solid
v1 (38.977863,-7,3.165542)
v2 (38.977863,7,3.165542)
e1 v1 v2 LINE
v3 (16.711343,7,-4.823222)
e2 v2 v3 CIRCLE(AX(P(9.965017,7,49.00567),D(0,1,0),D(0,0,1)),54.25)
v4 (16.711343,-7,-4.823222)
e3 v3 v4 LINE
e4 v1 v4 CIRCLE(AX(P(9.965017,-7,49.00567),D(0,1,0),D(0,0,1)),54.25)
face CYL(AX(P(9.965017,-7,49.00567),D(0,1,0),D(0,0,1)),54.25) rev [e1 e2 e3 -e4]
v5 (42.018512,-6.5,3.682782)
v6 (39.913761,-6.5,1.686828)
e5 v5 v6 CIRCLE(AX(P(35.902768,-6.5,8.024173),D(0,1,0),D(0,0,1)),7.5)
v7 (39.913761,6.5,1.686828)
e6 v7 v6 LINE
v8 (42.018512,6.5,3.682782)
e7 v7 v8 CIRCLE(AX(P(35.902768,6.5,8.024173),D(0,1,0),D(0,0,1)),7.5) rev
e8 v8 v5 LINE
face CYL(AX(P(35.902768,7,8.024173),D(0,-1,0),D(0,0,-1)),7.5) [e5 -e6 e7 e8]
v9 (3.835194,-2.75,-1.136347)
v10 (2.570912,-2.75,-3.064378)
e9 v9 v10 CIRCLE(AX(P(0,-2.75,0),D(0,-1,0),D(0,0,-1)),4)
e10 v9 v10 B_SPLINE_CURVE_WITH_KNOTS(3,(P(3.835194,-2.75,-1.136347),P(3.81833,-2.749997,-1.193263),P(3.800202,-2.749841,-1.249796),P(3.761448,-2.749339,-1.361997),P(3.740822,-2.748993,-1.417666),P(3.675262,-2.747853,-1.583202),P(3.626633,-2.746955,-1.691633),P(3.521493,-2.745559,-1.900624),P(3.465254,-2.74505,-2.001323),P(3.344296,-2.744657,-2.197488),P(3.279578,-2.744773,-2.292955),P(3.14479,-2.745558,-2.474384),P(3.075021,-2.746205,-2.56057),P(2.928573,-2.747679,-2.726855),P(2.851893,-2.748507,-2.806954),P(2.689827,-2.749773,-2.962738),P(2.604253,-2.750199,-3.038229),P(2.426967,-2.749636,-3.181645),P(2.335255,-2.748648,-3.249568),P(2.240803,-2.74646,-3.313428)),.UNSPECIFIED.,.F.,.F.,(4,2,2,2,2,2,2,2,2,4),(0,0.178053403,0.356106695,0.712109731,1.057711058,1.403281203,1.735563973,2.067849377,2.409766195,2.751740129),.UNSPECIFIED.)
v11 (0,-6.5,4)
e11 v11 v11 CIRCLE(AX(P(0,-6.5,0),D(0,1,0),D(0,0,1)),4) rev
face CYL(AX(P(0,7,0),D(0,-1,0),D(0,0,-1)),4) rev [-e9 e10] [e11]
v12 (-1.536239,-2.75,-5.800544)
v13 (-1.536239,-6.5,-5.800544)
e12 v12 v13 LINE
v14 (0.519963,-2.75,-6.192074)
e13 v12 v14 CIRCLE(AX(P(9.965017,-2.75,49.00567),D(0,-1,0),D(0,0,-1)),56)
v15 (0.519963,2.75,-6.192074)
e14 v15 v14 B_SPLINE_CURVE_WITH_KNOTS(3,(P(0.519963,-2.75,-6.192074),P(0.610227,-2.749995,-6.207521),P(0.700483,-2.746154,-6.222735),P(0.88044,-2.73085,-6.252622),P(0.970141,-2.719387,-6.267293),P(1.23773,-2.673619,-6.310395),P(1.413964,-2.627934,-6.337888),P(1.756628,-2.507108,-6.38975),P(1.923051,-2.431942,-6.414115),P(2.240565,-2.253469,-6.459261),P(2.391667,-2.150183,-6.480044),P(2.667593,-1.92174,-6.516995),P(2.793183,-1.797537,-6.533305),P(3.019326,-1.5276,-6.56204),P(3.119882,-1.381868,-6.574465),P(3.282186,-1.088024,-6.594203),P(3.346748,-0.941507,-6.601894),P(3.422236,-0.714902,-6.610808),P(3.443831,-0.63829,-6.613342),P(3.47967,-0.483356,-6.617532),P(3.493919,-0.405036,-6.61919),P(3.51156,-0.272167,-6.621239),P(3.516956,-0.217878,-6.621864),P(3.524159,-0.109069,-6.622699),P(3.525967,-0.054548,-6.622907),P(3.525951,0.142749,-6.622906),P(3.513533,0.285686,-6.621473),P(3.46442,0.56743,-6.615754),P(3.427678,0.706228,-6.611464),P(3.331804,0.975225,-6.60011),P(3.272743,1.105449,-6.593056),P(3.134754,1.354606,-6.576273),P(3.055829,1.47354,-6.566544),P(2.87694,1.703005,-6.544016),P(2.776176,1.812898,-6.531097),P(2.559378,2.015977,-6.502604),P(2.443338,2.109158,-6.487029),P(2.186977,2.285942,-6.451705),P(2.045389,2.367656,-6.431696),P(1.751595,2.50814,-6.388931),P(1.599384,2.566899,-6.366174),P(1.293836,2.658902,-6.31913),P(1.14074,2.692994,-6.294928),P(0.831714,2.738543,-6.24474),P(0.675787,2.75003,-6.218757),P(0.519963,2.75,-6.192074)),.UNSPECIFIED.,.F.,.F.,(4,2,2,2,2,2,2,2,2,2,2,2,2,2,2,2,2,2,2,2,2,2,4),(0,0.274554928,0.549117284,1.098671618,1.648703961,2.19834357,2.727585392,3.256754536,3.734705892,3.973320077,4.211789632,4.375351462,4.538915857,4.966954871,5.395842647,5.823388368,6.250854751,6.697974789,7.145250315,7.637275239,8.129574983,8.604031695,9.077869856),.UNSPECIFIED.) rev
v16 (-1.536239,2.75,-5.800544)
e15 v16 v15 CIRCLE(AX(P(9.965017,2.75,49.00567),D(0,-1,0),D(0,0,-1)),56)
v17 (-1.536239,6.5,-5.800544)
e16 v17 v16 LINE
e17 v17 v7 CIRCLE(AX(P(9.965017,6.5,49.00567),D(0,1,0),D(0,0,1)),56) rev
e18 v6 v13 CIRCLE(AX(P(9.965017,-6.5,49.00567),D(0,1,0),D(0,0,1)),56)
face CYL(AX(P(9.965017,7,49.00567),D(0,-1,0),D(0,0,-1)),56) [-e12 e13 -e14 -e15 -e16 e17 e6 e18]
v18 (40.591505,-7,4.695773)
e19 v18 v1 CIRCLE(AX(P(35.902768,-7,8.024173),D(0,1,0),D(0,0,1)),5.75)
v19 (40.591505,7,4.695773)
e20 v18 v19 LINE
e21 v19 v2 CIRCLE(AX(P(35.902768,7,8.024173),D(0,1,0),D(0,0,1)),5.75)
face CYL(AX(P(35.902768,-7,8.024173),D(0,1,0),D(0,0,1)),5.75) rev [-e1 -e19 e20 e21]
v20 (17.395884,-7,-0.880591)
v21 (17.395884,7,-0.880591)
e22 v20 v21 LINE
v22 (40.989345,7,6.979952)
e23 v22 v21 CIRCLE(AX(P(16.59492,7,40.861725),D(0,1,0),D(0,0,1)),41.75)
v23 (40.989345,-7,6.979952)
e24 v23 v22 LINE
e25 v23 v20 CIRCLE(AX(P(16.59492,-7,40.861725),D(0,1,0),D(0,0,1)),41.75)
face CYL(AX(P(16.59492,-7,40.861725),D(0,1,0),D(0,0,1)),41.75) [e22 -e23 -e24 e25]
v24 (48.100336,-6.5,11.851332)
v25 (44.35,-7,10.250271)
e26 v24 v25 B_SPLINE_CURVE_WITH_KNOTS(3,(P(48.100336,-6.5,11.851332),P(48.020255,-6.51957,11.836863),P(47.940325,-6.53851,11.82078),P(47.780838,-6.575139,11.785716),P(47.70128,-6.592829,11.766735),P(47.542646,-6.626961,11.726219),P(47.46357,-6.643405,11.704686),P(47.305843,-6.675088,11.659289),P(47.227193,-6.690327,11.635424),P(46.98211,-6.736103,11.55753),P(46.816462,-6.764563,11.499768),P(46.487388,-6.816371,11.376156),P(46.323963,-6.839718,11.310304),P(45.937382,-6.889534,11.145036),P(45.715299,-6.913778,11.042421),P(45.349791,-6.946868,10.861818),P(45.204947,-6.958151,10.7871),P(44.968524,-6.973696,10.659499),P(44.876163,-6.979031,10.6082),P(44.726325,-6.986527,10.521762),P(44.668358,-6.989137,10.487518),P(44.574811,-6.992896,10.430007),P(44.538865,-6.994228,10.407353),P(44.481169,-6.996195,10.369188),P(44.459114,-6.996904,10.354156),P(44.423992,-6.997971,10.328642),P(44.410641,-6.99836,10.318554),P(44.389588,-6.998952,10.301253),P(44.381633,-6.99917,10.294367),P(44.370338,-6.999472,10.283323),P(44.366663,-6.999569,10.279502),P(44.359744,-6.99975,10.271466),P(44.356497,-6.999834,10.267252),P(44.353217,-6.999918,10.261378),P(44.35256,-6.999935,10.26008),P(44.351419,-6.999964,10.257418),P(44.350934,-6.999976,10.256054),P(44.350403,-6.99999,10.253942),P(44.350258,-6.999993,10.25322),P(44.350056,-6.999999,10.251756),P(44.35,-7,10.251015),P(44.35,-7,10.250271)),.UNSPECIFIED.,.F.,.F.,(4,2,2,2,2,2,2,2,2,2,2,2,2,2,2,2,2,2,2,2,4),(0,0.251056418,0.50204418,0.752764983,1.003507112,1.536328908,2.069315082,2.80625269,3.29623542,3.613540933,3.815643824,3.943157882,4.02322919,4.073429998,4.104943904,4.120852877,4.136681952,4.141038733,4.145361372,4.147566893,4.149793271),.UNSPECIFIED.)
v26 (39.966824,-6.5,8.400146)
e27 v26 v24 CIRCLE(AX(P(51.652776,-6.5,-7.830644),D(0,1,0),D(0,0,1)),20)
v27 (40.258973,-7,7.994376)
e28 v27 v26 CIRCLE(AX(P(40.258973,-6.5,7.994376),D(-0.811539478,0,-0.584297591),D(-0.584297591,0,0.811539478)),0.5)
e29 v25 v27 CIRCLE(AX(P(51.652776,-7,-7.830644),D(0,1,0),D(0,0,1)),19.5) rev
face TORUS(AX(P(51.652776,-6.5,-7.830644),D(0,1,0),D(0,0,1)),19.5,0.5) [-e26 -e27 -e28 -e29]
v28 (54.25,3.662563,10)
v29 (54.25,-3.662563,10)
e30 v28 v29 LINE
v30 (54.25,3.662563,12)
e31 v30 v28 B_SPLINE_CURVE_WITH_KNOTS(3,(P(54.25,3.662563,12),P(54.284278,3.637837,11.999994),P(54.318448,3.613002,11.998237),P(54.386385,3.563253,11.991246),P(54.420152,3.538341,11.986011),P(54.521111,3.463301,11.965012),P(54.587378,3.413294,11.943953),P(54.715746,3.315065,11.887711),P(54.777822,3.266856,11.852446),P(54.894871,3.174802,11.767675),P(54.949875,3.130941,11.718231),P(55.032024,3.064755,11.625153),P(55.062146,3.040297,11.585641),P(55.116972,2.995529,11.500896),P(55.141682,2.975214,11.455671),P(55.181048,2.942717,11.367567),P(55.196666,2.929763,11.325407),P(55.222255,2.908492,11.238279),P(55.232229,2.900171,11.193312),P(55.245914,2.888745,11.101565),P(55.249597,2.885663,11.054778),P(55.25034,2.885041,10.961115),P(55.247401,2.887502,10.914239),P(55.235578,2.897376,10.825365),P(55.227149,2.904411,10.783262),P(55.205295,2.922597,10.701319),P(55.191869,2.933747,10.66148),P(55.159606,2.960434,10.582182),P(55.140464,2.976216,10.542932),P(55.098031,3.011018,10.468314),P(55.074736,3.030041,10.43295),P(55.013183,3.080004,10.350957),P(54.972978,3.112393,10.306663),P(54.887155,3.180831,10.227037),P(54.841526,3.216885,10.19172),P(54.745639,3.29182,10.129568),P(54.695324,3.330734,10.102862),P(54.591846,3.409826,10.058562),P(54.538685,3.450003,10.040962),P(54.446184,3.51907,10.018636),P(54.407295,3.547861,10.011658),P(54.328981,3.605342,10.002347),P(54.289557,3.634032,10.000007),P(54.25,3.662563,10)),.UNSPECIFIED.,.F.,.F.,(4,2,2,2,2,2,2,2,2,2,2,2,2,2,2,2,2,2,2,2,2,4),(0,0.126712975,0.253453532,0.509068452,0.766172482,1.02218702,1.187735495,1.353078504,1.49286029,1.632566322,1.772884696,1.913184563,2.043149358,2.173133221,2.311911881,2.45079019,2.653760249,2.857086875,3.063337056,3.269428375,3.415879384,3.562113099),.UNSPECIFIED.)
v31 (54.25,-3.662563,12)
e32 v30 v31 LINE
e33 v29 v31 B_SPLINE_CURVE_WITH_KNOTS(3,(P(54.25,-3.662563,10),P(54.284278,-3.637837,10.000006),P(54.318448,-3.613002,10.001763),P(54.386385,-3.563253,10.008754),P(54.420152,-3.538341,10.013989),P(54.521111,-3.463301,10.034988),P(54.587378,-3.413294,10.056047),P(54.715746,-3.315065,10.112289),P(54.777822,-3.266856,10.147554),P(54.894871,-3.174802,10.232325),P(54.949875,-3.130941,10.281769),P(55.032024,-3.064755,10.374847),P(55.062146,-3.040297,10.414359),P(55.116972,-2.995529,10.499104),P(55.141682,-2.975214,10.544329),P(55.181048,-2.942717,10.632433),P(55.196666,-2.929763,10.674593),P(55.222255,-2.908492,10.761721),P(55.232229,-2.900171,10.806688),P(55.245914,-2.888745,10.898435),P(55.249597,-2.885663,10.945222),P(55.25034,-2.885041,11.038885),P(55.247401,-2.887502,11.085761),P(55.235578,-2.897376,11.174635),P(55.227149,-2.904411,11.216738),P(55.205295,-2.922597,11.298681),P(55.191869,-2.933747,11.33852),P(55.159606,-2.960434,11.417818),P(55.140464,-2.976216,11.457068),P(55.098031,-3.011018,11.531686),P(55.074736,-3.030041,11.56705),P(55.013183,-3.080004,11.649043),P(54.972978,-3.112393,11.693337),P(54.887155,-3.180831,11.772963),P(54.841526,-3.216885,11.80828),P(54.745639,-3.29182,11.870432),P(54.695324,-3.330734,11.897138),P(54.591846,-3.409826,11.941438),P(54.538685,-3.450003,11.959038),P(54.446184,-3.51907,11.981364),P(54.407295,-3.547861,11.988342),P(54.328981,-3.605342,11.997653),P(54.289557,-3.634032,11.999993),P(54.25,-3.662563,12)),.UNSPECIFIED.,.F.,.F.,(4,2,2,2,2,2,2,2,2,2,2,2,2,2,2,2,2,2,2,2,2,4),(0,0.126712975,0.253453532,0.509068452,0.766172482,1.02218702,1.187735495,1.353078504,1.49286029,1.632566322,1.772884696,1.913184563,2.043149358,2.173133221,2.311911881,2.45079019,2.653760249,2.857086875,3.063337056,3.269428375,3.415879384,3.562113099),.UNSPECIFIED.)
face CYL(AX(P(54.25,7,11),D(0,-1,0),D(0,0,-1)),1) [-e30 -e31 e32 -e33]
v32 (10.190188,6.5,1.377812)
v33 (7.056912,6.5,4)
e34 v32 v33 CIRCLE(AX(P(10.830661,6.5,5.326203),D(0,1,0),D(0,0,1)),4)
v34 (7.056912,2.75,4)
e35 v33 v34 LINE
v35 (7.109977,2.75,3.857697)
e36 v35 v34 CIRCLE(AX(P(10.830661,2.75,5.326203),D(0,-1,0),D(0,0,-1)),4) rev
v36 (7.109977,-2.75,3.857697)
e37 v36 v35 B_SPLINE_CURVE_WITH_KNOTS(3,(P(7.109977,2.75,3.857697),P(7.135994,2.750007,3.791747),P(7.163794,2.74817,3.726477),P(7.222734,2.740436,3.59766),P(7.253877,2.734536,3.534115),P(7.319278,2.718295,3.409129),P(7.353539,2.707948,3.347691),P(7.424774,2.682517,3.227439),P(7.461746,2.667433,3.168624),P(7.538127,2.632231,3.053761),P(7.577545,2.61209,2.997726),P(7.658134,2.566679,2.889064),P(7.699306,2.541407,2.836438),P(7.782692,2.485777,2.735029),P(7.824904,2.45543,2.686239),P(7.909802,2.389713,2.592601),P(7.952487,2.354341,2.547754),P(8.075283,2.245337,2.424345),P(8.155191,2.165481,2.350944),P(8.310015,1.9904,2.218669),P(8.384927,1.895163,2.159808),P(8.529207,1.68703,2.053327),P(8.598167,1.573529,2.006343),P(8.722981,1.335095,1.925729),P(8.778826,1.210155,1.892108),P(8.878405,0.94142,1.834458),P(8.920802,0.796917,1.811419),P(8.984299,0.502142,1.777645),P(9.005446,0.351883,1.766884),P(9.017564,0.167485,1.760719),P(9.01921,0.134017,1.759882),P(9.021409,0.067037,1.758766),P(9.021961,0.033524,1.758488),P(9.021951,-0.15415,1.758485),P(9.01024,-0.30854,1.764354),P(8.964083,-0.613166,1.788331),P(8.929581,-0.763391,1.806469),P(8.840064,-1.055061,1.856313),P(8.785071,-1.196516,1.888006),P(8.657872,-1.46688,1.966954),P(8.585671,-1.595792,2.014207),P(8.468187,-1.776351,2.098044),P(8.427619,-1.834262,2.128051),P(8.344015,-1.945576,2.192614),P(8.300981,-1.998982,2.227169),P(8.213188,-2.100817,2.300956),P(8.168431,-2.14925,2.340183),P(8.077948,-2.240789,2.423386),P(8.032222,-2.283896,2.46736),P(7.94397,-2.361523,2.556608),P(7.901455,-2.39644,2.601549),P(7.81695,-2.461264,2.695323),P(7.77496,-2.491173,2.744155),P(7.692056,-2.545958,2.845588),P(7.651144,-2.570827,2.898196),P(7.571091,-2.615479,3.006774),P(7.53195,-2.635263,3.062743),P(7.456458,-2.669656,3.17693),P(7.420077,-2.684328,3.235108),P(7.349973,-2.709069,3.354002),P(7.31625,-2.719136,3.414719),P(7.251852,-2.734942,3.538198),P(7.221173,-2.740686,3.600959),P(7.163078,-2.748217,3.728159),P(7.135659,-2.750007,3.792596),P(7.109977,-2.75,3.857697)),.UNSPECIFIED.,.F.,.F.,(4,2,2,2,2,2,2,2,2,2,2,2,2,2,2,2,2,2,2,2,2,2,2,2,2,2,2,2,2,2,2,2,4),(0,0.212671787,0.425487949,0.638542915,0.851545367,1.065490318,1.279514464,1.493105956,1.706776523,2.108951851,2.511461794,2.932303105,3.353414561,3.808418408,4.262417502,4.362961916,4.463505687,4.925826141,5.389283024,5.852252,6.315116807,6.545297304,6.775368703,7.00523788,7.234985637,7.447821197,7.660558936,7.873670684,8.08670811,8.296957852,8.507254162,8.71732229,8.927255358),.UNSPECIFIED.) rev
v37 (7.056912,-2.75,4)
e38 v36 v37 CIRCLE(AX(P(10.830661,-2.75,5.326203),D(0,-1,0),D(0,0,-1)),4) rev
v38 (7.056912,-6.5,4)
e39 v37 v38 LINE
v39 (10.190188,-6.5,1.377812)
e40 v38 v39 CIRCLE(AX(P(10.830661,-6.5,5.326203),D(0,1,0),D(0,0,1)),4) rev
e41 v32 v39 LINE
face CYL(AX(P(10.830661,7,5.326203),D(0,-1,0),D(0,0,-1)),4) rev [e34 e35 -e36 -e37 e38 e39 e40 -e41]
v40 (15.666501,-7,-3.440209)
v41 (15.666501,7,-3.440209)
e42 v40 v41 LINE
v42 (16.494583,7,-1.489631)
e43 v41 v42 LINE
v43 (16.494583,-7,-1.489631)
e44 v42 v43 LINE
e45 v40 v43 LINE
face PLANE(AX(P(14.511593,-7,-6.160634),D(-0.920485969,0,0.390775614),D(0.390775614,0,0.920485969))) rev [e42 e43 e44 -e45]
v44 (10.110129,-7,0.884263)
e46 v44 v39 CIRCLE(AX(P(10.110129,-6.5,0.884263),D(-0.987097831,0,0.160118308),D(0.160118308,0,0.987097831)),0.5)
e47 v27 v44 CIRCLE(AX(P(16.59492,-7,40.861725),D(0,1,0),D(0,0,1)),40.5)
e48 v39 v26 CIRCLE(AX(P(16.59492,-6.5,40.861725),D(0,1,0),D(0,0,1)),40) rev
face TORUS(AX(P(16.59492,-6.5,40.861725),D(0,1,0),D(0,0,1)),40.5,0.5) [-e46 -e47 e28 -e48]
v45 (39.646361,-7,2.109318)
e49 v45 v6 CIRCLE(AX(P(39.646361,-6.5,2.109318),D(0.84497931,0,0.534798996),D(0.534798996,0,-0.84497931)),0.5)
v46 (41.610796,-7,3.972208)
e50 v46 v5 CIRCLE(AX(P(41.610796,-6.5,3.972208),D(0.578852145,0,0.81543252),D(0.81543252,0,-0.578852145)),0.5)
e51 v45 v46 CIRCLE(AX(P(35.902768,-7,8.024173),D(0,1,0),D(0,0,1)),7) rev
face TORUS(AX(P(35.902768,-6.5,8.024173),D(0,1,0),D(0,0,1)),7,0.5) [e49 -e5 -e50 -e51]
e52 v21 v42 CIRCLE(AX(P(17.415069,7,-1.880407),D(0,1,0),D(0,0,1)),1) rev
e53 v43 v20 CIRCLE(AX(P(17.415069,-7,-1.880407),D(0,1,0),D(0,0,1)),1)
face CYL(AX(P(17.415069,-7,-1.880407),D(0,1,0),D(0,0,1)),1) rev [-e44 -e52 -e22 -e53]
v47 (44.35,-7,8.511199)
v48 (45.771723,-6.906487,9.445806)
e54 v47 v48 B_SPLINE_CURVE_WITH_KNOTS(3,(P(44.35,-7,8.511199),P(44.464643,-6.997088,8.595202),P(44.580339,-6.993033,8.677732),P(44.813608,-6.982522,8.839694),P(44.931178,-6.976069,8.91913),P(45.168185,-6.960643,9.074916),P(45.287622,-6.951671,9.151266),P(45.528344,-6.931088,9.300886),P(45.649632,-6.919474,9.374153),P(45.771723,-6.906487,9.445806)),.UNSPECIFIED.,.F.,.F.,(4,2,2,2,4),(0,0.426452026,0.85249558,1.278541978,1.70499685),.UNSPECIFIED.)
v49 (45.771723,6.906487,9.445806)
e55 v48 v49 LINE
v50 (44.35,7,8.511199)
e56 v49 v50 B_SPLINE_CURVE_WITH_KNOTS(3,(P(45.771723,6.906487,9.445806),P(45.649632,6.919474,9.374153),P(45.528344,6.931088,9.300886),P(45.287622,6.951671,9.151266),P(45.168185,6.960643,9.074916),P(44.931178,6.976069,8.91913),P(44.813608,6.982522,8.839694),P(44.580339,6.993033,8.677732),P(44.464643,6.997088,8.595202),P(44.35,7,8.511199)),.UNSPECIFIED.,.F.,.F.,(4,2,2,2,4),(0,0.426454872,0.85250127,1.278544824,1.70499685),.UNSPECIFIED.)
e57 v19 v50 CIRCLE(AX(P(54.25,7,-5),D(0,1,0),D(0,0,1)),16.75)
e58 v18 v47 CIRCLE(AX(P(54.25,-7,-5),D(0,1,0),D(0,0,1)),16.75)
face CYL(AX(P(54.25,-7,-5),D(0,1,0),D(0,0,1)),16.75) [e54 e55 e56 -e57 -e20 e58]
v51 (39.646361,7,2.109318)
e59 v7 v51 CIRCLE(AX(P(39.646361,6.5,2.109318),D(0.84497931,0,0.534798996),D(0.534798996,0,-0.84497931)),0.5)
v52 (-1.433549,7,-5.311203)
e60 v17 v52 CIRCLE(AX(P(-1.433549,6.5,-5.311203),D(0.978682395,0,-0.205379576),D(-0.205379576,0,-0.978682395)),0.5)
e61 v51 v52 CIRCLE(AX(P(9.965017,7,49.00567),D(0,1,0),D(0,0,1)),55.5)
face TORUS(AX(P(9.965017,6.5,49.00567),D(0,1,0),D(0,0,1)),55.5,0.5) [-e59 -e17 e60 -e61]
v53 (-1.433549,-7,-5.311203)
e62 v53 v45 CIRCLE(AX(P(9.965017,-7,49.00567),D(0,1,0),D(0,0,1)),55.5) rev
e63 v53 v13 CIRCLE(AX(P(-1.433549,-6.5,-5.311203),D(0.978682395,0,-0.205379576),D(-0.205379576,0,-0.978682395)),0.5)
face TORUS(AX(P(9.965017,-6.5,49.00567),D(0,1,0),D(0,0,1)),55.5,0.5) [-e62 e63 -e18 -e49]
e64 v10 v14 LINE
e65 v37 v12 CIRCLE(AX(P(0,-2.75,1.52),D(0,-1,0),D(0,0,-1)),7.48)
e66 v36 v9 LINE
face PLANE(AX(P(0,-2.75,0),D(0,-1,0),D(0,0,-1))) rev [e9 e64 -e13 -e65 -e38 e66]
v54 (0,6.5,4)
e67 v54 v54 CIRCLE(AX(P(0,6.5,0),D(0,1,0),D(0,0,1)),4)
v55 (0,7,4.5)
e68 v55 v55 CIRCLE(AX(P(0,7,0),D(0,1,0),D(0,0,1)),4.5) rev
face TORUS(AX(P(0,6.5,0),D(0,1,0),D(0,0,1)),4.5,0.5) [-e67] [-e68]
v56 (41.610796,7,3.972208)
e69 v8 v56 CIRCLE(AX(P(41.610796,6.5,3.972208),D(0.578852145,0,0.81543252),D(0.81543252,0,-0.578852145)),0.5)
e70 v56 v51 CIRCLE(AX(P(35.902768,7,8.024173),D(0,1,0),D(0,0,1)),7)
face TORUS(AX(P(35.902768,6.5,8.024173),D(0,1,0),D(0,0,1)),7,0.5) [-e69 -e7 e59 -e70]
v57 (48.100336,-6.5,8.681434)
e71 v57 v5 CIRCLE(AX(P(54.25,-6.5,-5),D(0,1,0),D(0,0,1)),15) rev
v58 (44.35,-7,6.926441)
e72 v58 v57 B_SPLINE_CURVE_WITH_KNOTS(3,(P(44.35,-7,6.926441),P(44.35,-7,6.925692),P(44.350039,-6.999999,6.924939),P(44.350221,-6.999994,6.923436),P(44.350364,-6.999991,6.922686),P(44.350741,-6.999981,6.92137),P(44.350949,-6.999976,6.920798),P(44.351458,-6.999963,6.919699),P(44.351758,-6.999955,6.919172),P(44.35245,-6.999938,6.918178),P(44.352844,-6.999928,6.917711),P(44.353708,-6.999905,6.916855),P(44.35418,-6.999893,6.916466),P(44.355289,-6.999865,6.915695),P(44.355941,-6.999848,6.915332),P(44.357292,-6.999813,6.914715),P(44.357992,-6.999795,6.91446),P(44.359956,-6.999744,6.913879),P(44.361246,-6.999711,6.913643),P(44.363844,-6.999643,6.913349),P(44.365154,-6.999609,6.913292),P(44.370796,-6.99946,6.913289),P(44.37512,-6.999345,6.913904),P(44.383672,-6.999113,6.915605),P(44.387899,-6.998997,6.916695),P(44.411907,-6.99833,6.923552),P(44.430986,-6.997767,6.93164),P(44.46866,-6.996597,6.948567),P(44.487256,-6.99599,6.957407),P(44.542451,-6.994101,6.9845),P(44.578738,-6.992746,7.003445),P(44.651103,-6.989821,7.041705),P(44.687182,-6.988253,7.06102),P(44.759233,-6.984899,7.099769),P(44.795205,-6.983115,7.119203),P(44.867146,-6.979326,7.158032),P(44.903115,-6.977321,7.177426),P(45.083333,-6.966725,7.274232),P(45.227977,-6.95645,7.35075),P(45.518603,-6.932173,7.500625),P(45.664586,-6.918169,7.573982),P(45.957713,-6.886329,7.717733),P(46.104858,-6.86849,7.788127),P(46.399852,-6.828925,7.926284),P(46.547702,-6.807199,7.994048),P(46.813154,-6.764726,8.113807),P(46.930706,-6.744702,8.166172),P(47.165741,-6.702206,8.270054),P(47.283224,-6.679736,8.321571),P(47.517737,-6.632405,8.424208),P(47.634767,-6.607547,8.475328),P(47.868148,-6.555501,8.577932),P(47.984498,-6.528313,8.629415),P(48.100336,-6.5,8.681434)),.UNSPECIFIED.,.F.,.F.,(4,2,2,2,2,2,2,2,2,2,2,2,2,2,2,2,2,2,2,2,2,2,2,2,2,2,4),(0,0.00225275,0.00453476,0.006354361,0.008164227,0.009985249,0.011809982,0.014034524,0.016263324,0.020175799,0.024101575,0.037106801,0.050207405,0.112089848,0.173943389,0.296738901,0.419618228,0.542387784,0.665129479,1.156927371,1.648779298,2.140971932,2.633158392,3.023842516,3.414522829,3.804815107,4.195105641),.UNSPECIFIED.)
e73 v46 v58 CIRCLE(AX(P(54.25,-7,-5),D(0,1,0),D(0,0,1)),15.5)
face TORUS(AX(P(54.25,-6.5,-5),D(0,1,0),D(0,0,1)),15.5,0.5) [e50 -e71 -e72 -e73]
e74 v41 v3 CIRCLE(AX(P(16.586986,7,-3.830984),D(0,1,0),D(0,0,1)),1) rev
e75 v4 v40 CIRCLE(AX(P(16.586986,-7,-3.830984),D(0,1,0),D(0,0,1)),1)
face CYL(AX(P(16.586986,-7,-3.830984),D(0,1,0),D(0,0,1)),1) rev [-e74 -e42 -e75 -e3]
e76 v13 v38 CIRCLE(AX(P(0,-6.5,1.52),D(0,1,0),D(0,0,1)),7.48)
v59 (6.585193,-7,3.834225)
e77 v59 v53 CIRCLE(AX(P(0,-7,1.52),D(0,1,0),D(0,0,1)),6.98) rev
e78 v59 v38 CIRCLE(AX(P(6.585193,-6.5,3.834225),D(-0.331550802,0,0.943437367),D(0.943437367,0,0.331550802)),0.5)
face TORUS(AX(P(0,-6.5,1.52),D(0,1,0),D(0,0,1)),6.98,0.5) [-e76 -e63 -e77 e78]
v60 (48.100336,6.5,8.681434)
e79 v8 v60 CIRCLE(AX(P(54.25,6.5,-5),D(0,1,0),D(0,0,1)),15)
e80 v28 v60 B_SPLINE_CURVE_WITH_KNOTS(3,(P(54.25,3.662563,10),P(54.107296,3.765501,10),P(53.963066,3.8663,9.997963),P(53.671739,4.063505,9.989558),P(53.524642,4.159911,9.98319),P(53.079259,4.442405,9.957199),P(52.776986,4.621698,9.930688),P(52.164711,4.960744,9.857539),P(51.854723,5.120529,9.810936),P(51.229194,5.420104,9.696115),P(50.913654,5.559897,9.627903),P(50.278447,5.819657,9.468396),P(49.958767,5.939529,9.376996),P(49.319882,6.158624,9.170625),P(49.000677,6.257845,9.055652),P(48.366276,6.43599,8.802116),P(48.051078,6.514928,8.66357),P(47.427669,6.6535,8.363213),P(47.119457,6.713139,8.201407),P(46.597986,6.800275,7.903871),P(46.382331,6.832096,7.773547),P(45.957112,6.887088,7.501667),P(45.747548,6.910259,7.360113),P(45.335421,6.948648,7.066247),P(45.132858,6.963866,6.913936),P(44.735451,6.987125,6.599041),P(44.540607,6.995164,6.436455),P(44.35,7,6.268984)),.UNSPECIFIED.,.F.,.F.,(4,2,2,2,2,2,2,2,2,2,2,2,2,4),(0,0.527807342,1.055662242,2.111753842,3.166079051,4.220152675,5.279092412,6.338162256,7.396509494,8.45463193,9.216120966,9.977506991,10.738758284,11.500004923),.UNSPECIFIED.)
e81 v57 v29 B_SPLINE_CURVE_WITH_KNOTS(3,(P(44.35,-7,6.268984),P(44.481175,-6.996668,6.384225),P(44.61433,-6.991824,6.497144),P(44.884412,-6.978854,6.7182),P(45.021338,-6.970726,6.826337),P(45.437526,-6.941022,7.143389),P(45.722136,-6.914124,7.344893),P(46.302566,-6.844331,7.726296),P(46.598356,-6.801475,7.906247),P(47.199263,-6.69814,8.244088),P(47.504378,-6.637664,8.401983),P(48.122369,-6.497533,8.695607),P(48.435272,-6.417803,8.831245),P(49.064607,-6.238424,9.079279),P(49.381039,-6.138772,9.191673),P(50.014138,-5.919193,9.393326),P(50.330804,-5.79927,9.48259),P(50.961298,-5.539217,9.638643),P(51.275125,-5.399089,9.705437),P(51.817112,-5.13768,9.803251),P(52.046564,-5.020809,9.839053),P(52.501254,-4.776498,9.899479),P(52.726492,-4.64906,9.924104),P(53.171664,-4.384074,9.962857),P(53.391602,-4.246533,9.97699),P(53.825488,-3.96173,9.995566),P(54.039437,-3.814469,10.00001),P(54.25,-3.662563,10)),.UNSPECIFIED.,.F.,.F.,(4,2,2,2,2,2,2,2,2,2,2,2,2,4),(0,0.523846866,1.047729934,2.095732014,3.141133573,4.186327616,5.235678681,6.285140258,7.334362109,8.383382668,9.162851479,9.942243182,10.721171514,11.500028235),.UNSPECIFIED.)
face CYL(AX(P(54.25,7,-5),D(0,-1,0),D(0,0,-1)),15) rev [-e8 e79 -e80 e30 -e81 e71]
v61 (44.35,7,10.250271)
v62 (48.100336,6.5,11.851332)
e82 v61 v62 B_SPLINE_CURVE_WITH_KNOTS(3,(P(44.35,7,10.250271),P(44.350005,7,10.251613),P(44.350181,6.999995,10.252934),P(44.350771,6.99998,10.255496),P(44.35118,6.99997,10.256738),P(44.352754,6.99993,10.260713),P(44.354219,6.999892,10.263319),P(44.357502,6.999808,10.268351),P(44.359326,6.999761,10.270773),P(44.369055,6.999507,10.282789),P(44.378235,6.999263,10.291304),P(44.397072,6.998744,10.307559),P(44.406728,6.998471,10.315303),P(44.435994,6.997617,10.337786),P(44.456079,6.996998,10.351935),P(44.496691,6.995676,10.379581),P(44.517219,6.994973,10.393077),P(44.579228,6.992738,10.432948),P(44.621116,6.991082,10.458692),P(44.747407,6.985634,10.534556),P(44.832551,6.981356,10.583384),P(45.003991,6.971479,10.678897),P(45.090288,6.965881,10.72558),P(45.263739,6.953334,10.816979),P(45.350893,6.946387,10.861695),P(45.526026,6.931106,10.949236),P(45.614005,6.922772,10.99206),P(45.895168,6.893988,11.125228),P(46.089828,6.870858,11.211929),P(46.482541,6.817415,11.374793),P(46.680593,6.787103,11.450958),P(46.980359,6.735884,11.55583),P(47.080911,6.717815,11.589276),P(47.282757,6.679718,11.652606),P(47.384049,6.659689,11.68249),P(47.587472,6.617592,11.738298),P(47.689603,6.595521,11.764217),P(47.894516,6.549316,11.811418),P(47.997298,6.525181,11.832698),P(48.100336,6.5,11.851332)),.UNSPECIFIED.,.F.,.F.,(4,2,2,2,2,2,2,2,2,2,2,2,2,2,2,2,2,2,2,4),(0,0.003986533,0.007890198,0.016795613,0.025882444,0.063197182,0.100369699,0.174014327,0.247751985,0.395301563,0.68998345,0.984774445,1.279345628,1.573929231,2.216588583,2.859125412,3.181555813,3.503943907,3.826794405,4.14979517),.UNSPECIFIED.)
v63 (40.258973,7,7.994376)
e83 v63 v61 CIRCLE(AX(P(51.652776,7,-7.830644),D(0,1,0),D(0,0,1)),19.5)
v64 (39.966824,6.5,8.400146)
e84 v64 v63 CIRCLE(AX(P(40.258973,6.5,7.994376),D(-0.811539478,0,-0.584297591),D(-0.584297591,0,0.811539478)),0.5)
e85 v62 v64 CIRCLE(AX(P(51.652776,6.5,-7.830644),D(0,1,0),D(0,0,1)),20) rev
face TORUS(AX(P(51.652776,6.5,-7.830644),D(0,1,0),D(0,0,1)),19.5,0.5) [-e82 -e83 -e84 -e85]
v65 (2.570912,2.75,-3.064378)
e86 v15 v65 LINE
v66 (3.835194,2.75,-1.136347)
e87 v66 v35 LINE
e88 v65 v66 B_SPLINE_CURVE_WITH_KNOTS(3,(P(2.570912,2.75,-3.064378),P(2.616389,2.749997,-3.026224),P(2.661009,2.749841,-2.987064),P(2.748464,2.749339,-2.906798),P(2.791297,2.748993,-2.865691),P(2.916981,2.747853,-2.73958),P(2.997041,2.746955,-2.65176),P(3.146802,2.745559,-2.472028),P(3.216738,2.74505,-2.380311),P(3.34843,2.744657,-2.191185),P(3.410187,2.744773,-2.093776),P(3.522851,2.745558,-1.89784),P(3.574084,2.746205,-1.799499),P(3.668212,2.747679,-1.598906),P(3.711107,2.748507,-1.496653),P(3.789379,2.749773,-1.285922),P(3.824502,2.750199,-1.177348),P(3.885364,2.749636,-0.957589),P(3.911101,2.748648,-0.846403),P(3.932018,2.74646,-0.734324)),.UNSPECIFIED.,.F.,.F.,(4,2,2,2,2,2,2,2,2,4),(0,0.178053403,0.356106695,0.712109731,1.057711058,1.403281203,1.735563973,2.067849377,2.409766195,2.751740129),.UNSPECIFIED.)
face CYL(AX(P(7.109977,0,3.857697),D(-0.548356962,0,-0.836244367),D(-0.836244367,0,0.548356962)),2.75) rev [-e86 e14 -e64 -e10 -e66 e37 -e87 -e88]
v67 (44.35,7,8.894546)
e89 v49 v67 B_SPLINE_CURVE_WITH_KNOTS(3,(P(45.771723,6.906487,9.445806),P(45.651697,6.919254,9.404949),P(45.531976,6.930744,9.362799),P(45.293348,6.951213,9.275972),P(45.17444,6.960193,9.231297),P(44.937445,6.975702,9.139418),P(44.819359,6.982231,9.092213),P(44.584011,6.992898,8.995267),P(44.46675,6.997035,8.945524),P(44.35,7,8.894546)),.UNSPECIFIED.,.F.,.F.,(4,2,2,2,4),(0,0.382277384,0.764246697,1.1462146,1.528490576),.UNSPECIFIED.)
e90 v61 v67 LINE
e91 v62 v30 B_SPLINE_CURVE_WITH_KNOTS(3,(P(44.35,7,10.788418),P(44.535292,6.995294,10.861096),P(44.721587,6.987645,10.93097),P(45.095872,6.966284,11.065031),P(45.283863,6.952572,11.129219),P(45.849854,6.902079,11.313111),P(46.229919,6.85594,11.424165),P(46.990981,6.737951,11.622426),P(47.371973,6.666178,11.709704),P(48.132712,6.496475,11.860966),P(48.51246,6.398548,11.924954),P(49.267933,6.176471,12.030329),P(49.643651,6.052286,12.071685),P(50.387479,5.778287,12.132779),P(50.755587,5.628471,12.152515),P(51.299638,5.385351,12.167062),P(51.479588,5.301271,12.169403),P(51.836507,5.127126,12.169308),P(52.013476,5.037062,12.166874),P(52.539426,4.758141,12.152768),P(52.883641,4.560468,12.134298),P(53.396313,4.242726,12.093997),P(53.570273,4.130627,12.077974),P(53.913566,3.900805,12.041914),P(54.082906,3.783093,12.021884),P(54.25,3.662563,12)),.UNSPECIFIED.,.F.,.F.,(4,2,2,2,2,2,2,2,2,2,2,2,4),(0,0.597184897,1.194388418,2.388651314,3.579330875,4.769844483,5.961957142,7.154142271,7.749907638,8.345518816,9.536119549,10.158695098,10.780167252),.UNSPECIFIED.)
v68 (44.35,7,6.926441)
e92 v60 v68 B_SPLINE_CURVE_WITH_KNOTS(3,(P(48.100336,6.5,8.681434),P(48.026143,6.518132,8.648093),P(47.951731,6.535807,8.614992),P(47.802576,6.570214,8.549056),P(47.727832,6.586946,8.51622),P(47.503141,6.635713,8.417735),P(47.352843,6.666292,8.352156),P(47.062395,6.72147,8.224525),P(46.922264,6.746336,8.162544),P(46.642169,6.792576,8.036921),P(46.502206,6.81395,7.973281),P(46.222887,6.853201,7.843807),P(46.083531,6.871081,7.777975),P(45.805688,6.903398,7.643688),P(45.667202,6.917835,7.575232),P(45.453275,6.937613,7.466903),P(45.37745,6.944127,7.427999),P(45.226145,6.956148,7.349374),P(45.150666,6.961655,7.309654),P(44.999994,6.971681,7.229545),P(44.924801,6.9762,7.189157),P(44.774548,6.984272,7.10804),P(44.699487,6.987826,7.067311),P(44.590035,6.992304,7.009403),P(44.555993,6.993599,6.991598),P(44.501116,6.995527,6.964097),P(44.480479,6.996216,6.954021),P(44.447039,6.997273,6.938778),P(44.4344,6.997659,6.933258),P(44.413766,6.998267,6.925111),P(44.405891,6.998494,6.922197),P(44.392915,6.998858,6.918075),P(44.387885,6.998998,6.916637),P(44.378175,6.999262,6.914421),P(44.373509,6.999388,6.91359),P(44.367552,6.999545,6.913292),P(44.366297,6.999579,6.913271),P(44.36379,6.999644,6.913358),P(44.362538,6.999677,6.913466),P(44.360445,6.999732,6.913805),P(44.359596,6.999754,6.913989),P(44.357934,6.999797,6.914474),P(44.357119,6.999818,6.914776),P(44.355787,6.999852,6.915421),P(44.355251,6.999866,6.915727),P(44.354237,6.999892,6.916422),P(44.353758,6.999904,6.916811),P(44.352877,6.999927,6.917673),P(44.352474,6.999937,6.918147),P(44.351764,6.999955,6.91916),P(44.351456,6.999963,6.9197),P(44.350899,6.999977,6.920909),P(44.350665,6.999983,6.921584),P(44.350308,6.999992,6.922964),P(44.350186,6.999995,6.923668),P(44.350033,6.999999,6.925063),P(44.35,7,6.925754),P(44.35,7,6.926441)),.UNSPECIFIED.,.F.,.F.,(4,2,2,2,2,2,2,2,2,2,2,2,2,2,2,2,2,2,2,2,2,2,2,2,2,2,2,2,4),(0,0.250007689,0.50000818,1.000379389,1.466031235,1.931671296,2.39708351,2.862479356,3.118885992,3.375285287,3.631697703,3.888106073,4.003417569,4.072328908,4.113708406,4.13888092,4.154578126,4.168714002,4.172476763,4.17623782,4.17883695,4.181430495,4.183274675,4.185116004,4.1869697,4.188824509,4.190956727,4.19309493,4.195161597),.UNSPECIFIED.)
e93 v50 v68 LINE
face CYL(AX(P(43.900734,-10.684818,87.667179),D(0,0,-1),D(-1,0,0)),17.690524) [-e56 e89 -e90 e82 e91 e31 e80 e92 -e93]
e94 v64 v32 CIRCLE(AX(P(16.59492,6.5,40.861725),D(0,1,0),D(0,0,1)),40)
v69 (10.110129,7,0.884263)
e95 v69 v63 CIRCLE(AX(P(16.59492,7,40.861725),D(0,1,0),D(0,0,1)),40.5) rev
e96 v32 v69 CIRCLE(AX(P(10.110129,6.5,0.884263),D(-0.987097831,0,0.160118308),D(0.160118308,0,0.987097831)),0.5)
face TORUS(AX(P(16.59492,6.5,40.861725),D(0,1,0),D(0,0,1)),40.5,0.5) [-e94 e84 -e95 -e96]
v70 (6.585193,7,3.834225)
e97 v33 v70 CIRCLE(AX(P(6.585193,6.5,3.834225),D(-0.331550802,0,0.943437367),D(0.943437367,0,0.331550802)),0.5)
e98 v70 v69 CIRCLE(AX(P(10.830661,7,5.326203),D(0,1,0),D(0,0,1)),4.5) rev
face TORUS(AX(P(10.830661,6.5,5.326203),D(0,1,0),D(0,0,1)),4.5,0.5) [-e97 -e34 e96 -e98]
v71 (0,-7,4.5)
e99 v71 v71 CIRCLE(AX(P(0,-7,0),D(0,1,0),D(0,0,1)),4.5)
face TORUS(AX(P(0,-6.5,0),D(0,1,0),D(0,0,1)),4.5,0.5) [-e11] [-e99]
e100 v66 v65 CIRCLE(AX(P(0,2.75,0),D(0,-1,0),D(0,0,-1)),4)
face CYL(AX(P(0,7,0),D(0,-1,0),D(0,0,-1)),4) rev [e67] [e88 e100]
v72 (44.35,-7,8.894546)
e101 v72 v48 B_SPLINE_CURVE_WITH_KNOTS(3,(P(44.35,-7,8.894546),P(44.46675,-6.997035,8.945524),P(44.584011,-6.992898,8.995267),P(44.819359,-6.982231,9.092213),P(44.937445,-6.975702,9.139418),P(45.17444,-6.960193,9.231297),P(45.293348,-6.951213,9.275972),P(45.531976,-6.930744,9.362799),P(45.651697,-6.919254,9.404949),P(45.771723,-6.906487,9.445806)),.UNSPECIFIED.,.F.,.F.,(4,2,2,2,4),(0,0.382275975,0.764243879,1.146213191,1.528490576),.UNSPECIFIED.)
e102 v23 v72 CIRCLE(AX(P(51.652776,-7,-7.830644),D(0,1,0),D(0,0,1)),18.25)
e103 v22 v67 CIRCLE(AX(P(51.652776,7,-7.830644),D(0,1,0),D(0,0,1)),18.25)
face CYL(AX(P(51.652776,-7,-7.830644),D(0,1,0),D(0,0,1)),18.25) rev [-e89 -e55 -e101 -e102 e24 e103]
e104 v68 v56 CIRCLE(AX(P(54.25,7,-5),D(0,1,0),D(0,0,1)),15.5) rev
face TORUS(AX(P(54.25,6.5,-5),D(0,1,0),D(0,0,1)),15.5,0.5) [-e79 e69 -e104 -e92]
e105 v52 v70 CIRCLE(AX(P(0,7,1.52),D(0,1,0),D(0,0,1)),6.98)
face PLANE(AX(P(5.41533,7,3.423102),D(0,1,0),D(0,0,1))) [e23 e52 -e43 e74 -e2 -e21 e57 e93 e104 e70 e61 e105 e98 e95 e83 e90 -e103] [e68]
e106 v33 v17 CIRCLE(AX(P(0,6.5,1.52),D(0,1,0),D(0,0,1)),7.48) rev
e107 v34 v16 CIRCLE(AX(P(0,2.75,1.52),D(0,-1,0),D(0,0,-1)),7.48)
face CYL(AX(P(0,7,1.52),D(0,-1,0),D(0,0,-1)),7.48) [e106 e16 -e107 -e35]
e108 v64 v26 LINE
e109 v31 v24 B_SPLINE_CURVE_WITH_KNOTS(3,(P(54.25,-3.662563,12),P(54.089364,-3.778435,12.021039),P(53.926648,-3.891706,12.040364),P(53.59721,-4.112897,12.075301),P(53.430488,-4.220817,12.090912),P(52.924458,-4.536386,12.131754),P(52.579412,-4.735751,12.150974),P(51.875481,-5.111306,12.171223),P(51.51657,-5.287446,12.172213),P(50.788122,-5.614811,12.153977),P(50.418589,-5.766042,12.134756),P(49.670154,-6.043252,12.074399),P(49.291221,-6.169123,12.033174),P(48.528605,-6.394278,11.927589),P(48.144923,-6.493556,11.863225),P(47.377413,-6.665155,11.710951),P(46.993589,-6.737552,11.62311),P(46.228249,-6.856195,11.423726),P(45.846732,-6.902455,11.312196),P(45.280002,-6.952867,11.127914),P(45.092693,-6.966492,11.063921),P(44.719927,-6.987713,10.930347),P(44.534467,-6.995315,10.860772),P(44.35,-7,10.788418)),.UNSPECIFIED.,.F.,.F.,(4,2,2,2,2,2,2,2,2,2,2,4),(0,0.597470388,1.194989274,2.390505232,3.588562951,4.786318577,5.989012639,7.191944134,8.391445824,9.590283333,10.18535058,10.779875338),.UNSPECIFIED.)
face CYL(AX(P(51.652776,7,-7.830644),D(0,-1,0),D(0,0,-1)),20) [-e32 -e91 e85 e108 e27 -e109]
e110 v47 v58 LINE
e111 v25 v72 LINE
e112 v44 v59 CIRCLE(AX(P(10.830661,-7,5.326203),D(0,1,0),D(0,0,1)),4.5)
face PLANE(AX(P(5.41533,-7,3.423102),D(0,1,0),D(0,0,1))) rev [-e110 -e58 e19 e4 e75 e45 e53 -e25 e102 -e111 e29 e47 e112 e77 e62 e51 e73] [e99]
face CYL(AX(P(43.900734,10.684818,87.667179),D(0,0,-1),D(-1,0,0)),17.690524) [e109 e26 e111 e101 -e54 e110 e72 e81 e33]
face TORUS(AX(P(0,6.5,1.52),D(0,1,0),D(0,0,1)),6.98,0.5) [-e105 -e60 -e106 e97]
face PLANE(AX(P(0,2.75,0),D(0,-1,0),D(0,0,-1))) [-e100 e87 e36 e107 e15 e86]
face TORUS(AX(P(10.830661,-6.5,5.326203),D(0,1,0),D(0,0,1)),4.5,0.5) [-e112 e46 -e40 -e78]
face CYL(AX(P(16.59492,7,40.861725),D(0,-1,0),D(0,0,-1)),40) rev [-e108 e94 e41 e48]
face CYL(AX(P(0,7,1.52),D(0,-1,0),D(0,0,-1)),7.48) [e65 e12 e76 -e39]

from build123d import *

# Parameters (mm, degrees)
SKETCH1_R               = 4
BOSS_EXTRUDE1_DEPTH     = 7
CUT_EXTRUDE1_DEPTH      = 59.28083506170185
FILLET1_R               = 1
CUT_EXTRUDE2_DEPTH      = 2.75
FILLET2_R               = 2.75
CUT_EXTRUDE4_DEPTH      = 58.005751787773974
CUT_EXTRUDE4_DEPTH_BACK = 58.005751787773974
FILLET5_R               = 0.5


with BuildPart() as part:
    # Sketch1 → Boss-Extrude1 (new, symmetric)
    with BuildSketch(Plane(origin=(0, 0, 0), x_dir=(1, 0, 0), z_dir=(0, 1, 0))):
        with BuildLine():
            ThreePointArc((-1.5362392268059513, 5.800544312960797), (19.919545461636222, 6.102472647508904), (39.91376077319405, -1.6868284373804288))
            ThreePointArc((39.91376077319405, -1.6868284373804288), (41.063548787883846, -2.582083147400275), (42.0185122038675, -3.682782174686955))
            ThreePointArc((42.0185122038675, -3.682782174686955), (47.36674977282913, -8.32744785434), (54.25, -9.999999999999998))
            ThreePointArc((54.25, -9.999999999999998), (55.25, -11), (54.25, -11.999999999999996))
            ThreePointArc((54.25, -11.999999999999996), (46.76493567801582, -11.562886815142743), (39.96682371606345, -8.400145979510366))
            ThreePointArc((39.96682371606345, -8.400145979510366), (25.776397056728037, -1.9297269592280557), (10.190187741321731, -1.3778118857340655))
            ThreePointArc((10.190187741321731, -1.3778118857340655), (8.263501426962312, -2.2586811043636623), (7.056911505750941, -4))
            ThreePointArc((7.056911505750941, -4), (-5.624244199041766, -6.451356526306424), (-1.5362392268059513, 5.800544312960797))
        make_face()
        with Locations(Location((0, 0, 0), (0, 0, 270))):
            Circle(SKETCH1_R, mode=Mode.SUBTRACT)
    extrude(amount=BOSS_EXTRUDE1_DEPTH, both=True)

    # Sketch3 → Cut-Extrude1 (cut, through all)
    with BuildSketch(Plane(origin=(0, 7, 0), x_dir=(1, 0, 0), z_dir=(0, 1, 0))):
        with BuildLine():
            ThreePointArc((38.97786253080241, -3.165542229798767), (27.47285077170822, 2.3415624305985716), (15, 5.010174606274042))
            Line((15, 5.0101746062740515), (16.75, 0.8879868636733343))
            ThreePointArc((16.750000000000004, 0.8879868636733406), (29.48467011233651, -1.151312829335339), (40.989344500632356, -6.979951892378416))
            ThreePointArc((40.98934450063236, -6.979951892378416), (43.289158329312805, -8.390096443432645), (45.7717231121719, -9.445806346940953))
            ThreePointArc((45.77172311217189, -9.445806346940959), (42.92967017584709, -7.345551128742456), (40.59150529431871, -4.695773428400446))
            ThreePointArc((40.59150529431871, -4.695773428400444), (39.85936667539791, -3.8519041741473217), (38.977862530802405, -3.165542229798766))
        make_face()
    extrude(amount=-CUT_EXTRUDE1_DEPTH, mode=Mode.SUBTRACT)

    # Fillet1
    fillet1_edges = [part.edges().sort_by_distance(p)[0] for p in [
        (16.75, 0, -0.887986863673341),
        (15, 0, -5.010174606274051),
    ]]
    fillet(fillet1_edges, radius=FILLET1_R)

    # Sketch4 → Cut-Extrude2 (cut, symmetric)
    with BuildSketch(Plane(origin=(0, 0, 0), x_dir=(1, 0, 0), z_dir=(0, 1, 0))):
        Polygon((0, 12), (-18.3, -2.24e-15), (-6.299999999999993, -18.3), (12.000000000000005, -6.299999999999997), align=None)
    extrude(amount=CUT_EXTRUDE2_DEPTH, both=True, mode=Mode.SUBTRACT)

    # Fillet2
    # the kernel refuses this fillet: 2.75 mm, written as the material it adds along each edge
    with BuildSketch(Plane(origin=(12.791913003977236, -2.75, 7.507667331065273), x_dir=(0, 1, 0), z_dir=(-0.5483569622202411, 0, -0.8362443673858672))) as fillet2_piece_1_section:
        with BuildLine():
            CenterArc((FILLET2_R, -FILLET2_R), FILLET2_R, 90, 90)
            Line((-4.4e-16, -FILLET2_R), (0, 0))
            Line((0, 0), (FILLET2_R, 0))
        make_face()
    fillet2_piece_1 = extrude(amount=23.77266181811646, mode=Mode.PRIVATE)
    fillet2_piece_1 = fillet2_piece_1 - Plane(origin=(10.830660974066888, -2.75, 5.326203208556105), x_dir=(-0.1601183081862921, 0, -0.9870978307055283), z_dir=(0, 1, 0)) * Cylinder(3.9999999999999254, 59, mode=Mode.PRIVATE)
    fillet2_piece_1 = fillet2_piece_1 & Plane(origin=(9.965017016661069, -2.75, 49.00566979476703), x_dir=(-0.205379575776197, 0, -0.9786823947808551), z_dir=(0, 1, 0)) * Cylinder(55.99999999999994, 59, mode=Mode.PRIVATE)
    fillet2_piece_1 = fillet2_piece_1 - Plane(origin=(0, -2.75, 0), x_dir=(-1.8e-16, 0, 1), z_dir=(0, -1, 0)) * Cylinder(4, 59, mode=Mode.PRIVATE)
    add(fillet2_piece_1)
    with BuildSketch(Plane(origin=(12.791913003977236, 2.75, 7.507667331065273), x_dir=(-0.8362443673858672, 0, 0.548356962220241), z_dir=(-0.5483569622202411, 0, -0.8362443673858672))) as fillet2_piece_2_section:
        with BuildLine():
            CenterArc((FILLET2_R, -FILLET2_R), FILLET2_R, 90, 90)
            Line((0, -FILLET2_R), (0, 0))
            Line((0, 0), (FILLET2_R, 0))
        make_face()
    fillet2_piece_2 = extrude(amount=23.77266181811646, mode=Mode.PRIVATE)
    fillet2_piece_2 = fillet2_piece_2 - Plane(origin=(10.830660974066888, 2.75, 5.326203208556105), x_dir=(-0.1601183081862921, 0, -0.9870978307055283), z_dir=(0, 1, 0)) * Cylinder(3.9999999999999254, 59, mode=Mode.PRIVATE)
    fillet2_piece_2 = fillet2_piece_2 & Plane(origin=(9.965017016661069, 2.75, 49.00566979476703), x_dir=(-0.205379575776197, 0, -0.9786823947808551), z_dir=(0, 1, 0)) * Cylinder(55.99999999999994, 59, mode=Mode.PRIVATE)
    fillet2_piece_2 = fillet2_piece_2 - Plane(origin=(0, 2.75, 0), x_dir=(-1.8e-16, 0, 1), z_dir=(0, -1, 0)) * Cylinder(4, 59, mode=Mode.PRIVATE)
    add(fillet2_piece_2)

    # Sketch5 → Cut-Extrude4 (cut, two sides: drawn at the far end of the back side and taken through both)
    with BuildSketch(Plane.XY.offset(-CUT_EXTRUDE4_DEPTH_BACK)):
        with BuildLine():
            Line((-72.98716670228313, -9.980836435146946), (44.34999999999997, -7))
            ThreePointArc((44.34999999999997, -7), (51.97321481572282, -5.056518890659532), (58, 0))
            ThreePointArc((58, 0), (51.97321481572283, 5.056518890659516), (44.35, 7))
            Line((44.35, 7), (-72.98716670228305, 9.980836435148523))
            Line((-72.98716670228305, 9.980836435148523), (161.76287973496454, 9.980836435147522))
            Line((161.76287973496454, 9.980836435147522), (161.76287973496446, -9.980836435147948))
            Line((161.76287973496446, -9.980836435147948), (-72.98716670228313, -9.980836435146946))
        make_face()
    extrude(amount=CUT_EXTRUDE4_DEPTH + CUT_EXTRUDE4_DEPTH_BACK, mode=Mode.SUBTRACT)

    # Fillet5
    # the kernel refuses this fillet: 0.5 mm, written as the material it takes off along each edge
    with BuildSketch(Plane(origin=(54.25000000000004, -7, -5.000000000000073), x_dir=(-0.8154325197421656, 0, 0.5788521449791326), z_dir=(-0.5788521449791326, 0, -0.8154325197421656))) as fillet5_piece_1:
        with BuildLine():
            CenterArc((15.00000000000007 + FILLET5_R, FILLET5_R), FILLET5_R, 180, 90)
            Line((15.000000000000071, FILLET5_R), (15.00000000000007, 0))
            Line((15.00000000000007, 0), (15.00000000000007 + FILLET5_R, 0))
        make_face()
    revolve(axis=Axis((54.25000000000004, -7, -5.000000000000073), (0, 1, 0)), revolution_arc=37.203729931637106, mode=Mode.SUBTRACT)
    with BuildSketch(Plane(origin=(35.90276830580119, -7, 8.024173262030505), x_dir=(0.5347989956523749, 0, -0.8449793099533331), z_dir=(-0.8449793099533331, 0, -0.5347989956523749))) as fillet5_piece_2:
        with BuildLine():
            CenterArc((7.5000000000000915 - FILLET5_R, -FILLET5_R), FILLET5_R, 0, 90)
            Line((7.5000000000000915, -FILLET5_R), (7.5000000000000915, 0))
            Line((7.5000000000000915, 0), (7.5000000000000915 - FILLET5_R, 0))
        make_face()
    revolve(axis=Axis((35.90276830580119, -7, 8.024173262030505), (0, -1, 0)), revolution_arc=22.29987011056575, mode=Mode.SUBTRACT)
    with BuildSketch(Plane(origin=(51.65277553970825, -7, -7.8306435877121405), x_dir=(-0.06124033983071464, 0, 0.9981230489160234), z_dir=(0.9981230489160234, 0, 0.06124033983071464))) as fillet5_piece_3:
        with BuildLine():
            CenterArc((20.00000000000016 - FILLET5_R, -FILLET5_R), FILLET5_R, 0, 90)
            Line((20.000000000000156, -FILLET5_R), (20.00000000000016, 0))
            Line((20.00000000000016, 0), (20.00000000000016 - FILLET5_R, 0))
        make_face()
    revolve(axis=Axis((51.65277553970825, -7, -7.8306435877121405), (0, -1, 0)), revolution_arc=32.24237358816158, mode=Mode.SUBTRACT)
    with BuildSketch(Plane(origin=(16.59492006877398, -7, 40.86172511395514), x_dir=(0.5842975911822361, 0, -0.8115394783611185), z_dir=(0.8115394783611185, 0, 0.5842975911822361))) as fillet5_piece_4:
        with BuildLine():
            CenterArc((40.00000000000002 + FILLET5_R, FILLET5_R), FILLET5_R, 180, 90)
            Line((40.00000000000002, FILLET5_R), (40.00000000000002, 0))
            Line((40.00000000000002, 0), (40.00000000000002 + FILLET5_R, 0))
        make_face()
    revolve(axis=Axis((16.59492006877398, -7, 40.86172511395514), (0, 1, 0)), revolution_arc=44.96714685168292, mode=Mode.SUBTRACT)
    with BuildSketch(Plane(origin=(10.830660974066888, -7, 5.326203208556105), x_dir=(-0.16011830818629214, 0, -0.9870978307055283), z_dir=(0.9870978307055283, 0, -0.16011830818629214))) as fillet5_piece_5:
        with BuildLine():
            CenterArc((3.999999999999926 + FILLET5_R, FILLET5_R), FILLET5_R, 180, 90)
            Line((3.9999999999999267, FILLET5_R), (3.999999999999926, 0))
            Line((3.999999999999926, 0), (3.999999999999926 + FILLET5_R, 0))
        make_face()
    revolve(axis=Axis((10.830660974066888, -7, 5.326203208556105), (0, 1, 0)), revolution_arc=61.423306762485126, mode=Mode.SUBTRACT)
    with BuildSketch(Plane(origin=(4.16e-15, -7, 1.5199999999999974), x_dir=(0.9434373670790025, 0, 0.33155080213903787), z_dir=(0.33155080213903787, 0, -0.9434373670790025))) as fillet5_piece_6:
        with BuildLine():
            CenterArc((7.479999999999999 - FILLET5_R, -FILLET5_R), FILLET5_R, 0, 90)
            Line((7.479999999999999, -FILLET5_R), (7.479999999999999, 0))
            Line((7.479999999999999, 0), (7.479999999999999 - FILLET5_R, 0))
        make_face()
    revolve(axis=Axis((4.16e-15, -7, 1.5199999999999974), (0, -1, 0)), revolution_arc=238.78535012747108, mode=Mode.SUBTRACT)
    with BuildSketch(Plane(origin=(54.25000000000004, 7, -5.000000000000073), x_dir=(-0.8154325197421656, 0, 0.5788521449791326), z_dir=(-0.5788521449791326, 0, -0.8154325197421656))) as fillet5_piece_7:
        with BuildLine():
            CenterArc((15.00000000000007 + FILLET5_R, -FILLET5_R), FILLET5_R, 90, 90)
            Line((15.00000000000007, -FILLET5_R), (15.00000000000007, 0))
            Line((15.00000000000007, 0), (15.00000000000007 + FILLET5_R, 0))
        make_face()
    revolve(axis=Axis((54.25000000000004, 7, -5.000000000000073), (0, 1, 0)), revolution_arc=37.20372993163729, mode=Mode.SUBTRACT)
    with BuildSketch(Plane(origin=(35.90276830580119, 7, 8.024173262030505), x_dir=(0.5347989956523749, 0, -0.8449793099533331), z_dir=(-0.8449793099533331, 0, -0.5347989956523749))) as fillet5_piece_8:
        with BuildLine():
            CenterArc((7.5000000000000915 - FILLET5_R, FILLET5_R), FILLET5_R, 270, 90)
            Line((7.5000000000000915, FILLET5_R), (7.5000000000000915, 0))
            Line((7.5000000000000915, 0), (7.5000000000000915 - FILLET5_R, 0))
        make_face()
    revolve(axis=Axis((35.90276830580119, 7, 8.024173262030505), (0, -1, 0)), revolution_arc=22.29987011056575, mode=Mode.SUBTRACT)
    with BuildSketch(Plane(origin=(9.965017016661069, 7, 49.00566979476703), x_dir=(-0.205379575776197, 0, -0.9786823947808551), z_dir=(-0.9786823947808551, 0, 0.205379575776197))) as fillet5_piece_9:
        with BuildLine():
            CenterArc((55.99999999999994 - FILLET5_R, FILLET5_R), FILLET5_R, 270, 90)
            Line((55.99999999999994, FILLET5_R), (55.99999999999994, 0))
            Line((55.99999999999994, 0), (55.99999999999994 - FILLET5_R, 0))
        make_face()
    revolve(axis=Axis((9.965017016661069, 7, 49.00566979476703), (0, -1, 0)), revolution_arc=44.182000772164294, mode=Mode.SUBTRACT)
    with BuildSketch(Plane(origin=(51.65277553970825, 7, -7.8306435877121405), x_dir=(-0.06124033983071322, 0, 0.9981230489160237), z_dir=(0.9981230489160237, 0, 0.06124033983071322))) as fillet5_piece_10:
        with BuildLine():
            CenterArc((20.000000000000163 - FILLET5_R, FILLET5_R), FILLET5_R, 270, 90)
            Line((20.000000000000163, FILLET5_R), (20.000000000000163, 0))
            Line((20.000000000000163, 0), (20.000000000000163 - FILLET5_R, 0))
        make_face()
    revolve(axis=Axis((51.65277553970825, 7, -7.8306435877121405), (0, -1, 0)), revolution_arc=32.24237358816166, mode=Mode.SUBTRACT)
    with BuildSketch(Plane(origin=(16.59492006877398, 7, 40.86172511395514), x_dir=(0.5842975911822361, 0, -0.8115394783611185), z_dir=(0.8115394783611185, 0, 0.5842975911822361))) as fillet5_piece_11:
        with BuildLine():
            CenterArc((40.00000000000002 + FILLET5_R, -FILLET5_R), FILLET5_R, 90, 90)
            Line((40.00000000000002, -FILLET5_R), (40.00000000000002, 0))
            Line((40.00000000000002, 0), (40.00000000000002 + FILLET5_R, 0))
        make_face()
    revolve(axis=Axis((16.59492006877398, 7, 40.86172511395514), (0, 1, 0)), revolution_arc=44.96714685168292, mode=Mode.SUBTRACT)
    with BuildSketch(Plane(origin=(10.830660974066888, 7, 5.326203208556105), x_dir=(-0.16011830818629214, 0, -0.9870978307055283), z_dir=(0.9870978307055283, 0, -0.16011830818629214))) as fillet5_piece_12:
        with BuildLine():
            CenterArc((3.999999999999926 + FILLET5_R, -FILLET5_R), FILLET5_R, 90, 90)
            Line((3.9999999999999267, -FILLET5_R), (3.999999999999926, 0))
            Line((3.999999999999926, 0), (3.999999999999926 + FILLET5_R, 0))
        make_face()
    revolve(axis=Axis((10.830660974066888, 7, 5.326203208556105), (0, 1, 0)), revolution_arc=61.423306762485126, mode=Mode.SUBTRACT)
    with BuildSketch(Plane(origin=(0, -7, 0), x_dir=(-1.8e-16, 0, 1), z_dir=(-1, 0, -1.8e-16))) as fillet5_piece_13:
        with BuildLine():
            CenterArc((4 + FILLET5_R, FILLET5_R), FILLET5_R, 180, 90)
            Line((4, FILLET5_R), (4, 0))
            Line((4, 0), (4 + FILLET5_R, 0))
        make_face()
    revolve(axis=Axis((0, -7, 0), (0, 1, 0)), mode=Mode.SUBTRACT)
    with BuildSketch(Plane(origin=(9.965017016661069, -7, 49.00566979476703), x_dir=(-0.205379575776197, 0, -0.9786823947808551), z_dir=(-0.9786823947808551, 0, 0.205379575776197))) as fillet5_piece_14:
        with BuildLine():
            CenterArc((55.99999999999994 - FILLET5_R, -FILLET5_R), FILLET5_R, 0, 90)
            Line((55.99999999999994, -FILLET5_R), (55.99999999999994, 0))
            Line((55.99999999999994, 0), (55.99999999999994 - FILLET5_R, 0))
        make_face()
    revolve(axis=Axis((9.965017016661069, -7, 49.00566979476703), (0, -1, 0)), revolution_arc=44.182000772164294, mode=Mode.SUBTRACT)
    with BuildSketch(Plane(origin=(4.16e-15, 7, 1.5199999999999974), x_dir=(0.9434373670790025, 0, 0.33155080213903787), z_dir=(0.33155080213903787, 0, -0.9434373670790025))) as fillet5_piece_15:
        with BuildLine():
            CenterArc((7.479999999999999 - FILLET5_R, FILLET5_R), FILLET5_R, 270, 90)
            Line((7.479999999999999, FILLET5_R), (7.479999999999999, 0))
            Line((7.479999999999999, 0), (7.479999999999999 - FILLET5_R, 0))
        make_face()
    revolve(axis=Axis((4.16e-15, 7, 1.5199999999999974), (0, -1, 0)), revolution_arc=238.78535012747108, mode=Mode.SUBTRACT)
    with BuildSketch(Plane(origin=(0, 7, 0), x_dir=(-1.8e-16, 0, 1), z_dir=(-1, 0, -1.8e-16))) as fillet5_piece_16:
        with BuildLine():
            CenterArc((4 + FILLET5_R, -FILLET5_R), FILLET5_R, 90, 90)
            Line((4 + FILLET5_R, 0), (4, 0))
            Line((4, 0), (4, -FILLET5_R))
        make_face()
    revolve(axis=Axis((0, 7, 0), (0, 1, 0)), mode=Mode.SUBTRACT)


solid = part.part
